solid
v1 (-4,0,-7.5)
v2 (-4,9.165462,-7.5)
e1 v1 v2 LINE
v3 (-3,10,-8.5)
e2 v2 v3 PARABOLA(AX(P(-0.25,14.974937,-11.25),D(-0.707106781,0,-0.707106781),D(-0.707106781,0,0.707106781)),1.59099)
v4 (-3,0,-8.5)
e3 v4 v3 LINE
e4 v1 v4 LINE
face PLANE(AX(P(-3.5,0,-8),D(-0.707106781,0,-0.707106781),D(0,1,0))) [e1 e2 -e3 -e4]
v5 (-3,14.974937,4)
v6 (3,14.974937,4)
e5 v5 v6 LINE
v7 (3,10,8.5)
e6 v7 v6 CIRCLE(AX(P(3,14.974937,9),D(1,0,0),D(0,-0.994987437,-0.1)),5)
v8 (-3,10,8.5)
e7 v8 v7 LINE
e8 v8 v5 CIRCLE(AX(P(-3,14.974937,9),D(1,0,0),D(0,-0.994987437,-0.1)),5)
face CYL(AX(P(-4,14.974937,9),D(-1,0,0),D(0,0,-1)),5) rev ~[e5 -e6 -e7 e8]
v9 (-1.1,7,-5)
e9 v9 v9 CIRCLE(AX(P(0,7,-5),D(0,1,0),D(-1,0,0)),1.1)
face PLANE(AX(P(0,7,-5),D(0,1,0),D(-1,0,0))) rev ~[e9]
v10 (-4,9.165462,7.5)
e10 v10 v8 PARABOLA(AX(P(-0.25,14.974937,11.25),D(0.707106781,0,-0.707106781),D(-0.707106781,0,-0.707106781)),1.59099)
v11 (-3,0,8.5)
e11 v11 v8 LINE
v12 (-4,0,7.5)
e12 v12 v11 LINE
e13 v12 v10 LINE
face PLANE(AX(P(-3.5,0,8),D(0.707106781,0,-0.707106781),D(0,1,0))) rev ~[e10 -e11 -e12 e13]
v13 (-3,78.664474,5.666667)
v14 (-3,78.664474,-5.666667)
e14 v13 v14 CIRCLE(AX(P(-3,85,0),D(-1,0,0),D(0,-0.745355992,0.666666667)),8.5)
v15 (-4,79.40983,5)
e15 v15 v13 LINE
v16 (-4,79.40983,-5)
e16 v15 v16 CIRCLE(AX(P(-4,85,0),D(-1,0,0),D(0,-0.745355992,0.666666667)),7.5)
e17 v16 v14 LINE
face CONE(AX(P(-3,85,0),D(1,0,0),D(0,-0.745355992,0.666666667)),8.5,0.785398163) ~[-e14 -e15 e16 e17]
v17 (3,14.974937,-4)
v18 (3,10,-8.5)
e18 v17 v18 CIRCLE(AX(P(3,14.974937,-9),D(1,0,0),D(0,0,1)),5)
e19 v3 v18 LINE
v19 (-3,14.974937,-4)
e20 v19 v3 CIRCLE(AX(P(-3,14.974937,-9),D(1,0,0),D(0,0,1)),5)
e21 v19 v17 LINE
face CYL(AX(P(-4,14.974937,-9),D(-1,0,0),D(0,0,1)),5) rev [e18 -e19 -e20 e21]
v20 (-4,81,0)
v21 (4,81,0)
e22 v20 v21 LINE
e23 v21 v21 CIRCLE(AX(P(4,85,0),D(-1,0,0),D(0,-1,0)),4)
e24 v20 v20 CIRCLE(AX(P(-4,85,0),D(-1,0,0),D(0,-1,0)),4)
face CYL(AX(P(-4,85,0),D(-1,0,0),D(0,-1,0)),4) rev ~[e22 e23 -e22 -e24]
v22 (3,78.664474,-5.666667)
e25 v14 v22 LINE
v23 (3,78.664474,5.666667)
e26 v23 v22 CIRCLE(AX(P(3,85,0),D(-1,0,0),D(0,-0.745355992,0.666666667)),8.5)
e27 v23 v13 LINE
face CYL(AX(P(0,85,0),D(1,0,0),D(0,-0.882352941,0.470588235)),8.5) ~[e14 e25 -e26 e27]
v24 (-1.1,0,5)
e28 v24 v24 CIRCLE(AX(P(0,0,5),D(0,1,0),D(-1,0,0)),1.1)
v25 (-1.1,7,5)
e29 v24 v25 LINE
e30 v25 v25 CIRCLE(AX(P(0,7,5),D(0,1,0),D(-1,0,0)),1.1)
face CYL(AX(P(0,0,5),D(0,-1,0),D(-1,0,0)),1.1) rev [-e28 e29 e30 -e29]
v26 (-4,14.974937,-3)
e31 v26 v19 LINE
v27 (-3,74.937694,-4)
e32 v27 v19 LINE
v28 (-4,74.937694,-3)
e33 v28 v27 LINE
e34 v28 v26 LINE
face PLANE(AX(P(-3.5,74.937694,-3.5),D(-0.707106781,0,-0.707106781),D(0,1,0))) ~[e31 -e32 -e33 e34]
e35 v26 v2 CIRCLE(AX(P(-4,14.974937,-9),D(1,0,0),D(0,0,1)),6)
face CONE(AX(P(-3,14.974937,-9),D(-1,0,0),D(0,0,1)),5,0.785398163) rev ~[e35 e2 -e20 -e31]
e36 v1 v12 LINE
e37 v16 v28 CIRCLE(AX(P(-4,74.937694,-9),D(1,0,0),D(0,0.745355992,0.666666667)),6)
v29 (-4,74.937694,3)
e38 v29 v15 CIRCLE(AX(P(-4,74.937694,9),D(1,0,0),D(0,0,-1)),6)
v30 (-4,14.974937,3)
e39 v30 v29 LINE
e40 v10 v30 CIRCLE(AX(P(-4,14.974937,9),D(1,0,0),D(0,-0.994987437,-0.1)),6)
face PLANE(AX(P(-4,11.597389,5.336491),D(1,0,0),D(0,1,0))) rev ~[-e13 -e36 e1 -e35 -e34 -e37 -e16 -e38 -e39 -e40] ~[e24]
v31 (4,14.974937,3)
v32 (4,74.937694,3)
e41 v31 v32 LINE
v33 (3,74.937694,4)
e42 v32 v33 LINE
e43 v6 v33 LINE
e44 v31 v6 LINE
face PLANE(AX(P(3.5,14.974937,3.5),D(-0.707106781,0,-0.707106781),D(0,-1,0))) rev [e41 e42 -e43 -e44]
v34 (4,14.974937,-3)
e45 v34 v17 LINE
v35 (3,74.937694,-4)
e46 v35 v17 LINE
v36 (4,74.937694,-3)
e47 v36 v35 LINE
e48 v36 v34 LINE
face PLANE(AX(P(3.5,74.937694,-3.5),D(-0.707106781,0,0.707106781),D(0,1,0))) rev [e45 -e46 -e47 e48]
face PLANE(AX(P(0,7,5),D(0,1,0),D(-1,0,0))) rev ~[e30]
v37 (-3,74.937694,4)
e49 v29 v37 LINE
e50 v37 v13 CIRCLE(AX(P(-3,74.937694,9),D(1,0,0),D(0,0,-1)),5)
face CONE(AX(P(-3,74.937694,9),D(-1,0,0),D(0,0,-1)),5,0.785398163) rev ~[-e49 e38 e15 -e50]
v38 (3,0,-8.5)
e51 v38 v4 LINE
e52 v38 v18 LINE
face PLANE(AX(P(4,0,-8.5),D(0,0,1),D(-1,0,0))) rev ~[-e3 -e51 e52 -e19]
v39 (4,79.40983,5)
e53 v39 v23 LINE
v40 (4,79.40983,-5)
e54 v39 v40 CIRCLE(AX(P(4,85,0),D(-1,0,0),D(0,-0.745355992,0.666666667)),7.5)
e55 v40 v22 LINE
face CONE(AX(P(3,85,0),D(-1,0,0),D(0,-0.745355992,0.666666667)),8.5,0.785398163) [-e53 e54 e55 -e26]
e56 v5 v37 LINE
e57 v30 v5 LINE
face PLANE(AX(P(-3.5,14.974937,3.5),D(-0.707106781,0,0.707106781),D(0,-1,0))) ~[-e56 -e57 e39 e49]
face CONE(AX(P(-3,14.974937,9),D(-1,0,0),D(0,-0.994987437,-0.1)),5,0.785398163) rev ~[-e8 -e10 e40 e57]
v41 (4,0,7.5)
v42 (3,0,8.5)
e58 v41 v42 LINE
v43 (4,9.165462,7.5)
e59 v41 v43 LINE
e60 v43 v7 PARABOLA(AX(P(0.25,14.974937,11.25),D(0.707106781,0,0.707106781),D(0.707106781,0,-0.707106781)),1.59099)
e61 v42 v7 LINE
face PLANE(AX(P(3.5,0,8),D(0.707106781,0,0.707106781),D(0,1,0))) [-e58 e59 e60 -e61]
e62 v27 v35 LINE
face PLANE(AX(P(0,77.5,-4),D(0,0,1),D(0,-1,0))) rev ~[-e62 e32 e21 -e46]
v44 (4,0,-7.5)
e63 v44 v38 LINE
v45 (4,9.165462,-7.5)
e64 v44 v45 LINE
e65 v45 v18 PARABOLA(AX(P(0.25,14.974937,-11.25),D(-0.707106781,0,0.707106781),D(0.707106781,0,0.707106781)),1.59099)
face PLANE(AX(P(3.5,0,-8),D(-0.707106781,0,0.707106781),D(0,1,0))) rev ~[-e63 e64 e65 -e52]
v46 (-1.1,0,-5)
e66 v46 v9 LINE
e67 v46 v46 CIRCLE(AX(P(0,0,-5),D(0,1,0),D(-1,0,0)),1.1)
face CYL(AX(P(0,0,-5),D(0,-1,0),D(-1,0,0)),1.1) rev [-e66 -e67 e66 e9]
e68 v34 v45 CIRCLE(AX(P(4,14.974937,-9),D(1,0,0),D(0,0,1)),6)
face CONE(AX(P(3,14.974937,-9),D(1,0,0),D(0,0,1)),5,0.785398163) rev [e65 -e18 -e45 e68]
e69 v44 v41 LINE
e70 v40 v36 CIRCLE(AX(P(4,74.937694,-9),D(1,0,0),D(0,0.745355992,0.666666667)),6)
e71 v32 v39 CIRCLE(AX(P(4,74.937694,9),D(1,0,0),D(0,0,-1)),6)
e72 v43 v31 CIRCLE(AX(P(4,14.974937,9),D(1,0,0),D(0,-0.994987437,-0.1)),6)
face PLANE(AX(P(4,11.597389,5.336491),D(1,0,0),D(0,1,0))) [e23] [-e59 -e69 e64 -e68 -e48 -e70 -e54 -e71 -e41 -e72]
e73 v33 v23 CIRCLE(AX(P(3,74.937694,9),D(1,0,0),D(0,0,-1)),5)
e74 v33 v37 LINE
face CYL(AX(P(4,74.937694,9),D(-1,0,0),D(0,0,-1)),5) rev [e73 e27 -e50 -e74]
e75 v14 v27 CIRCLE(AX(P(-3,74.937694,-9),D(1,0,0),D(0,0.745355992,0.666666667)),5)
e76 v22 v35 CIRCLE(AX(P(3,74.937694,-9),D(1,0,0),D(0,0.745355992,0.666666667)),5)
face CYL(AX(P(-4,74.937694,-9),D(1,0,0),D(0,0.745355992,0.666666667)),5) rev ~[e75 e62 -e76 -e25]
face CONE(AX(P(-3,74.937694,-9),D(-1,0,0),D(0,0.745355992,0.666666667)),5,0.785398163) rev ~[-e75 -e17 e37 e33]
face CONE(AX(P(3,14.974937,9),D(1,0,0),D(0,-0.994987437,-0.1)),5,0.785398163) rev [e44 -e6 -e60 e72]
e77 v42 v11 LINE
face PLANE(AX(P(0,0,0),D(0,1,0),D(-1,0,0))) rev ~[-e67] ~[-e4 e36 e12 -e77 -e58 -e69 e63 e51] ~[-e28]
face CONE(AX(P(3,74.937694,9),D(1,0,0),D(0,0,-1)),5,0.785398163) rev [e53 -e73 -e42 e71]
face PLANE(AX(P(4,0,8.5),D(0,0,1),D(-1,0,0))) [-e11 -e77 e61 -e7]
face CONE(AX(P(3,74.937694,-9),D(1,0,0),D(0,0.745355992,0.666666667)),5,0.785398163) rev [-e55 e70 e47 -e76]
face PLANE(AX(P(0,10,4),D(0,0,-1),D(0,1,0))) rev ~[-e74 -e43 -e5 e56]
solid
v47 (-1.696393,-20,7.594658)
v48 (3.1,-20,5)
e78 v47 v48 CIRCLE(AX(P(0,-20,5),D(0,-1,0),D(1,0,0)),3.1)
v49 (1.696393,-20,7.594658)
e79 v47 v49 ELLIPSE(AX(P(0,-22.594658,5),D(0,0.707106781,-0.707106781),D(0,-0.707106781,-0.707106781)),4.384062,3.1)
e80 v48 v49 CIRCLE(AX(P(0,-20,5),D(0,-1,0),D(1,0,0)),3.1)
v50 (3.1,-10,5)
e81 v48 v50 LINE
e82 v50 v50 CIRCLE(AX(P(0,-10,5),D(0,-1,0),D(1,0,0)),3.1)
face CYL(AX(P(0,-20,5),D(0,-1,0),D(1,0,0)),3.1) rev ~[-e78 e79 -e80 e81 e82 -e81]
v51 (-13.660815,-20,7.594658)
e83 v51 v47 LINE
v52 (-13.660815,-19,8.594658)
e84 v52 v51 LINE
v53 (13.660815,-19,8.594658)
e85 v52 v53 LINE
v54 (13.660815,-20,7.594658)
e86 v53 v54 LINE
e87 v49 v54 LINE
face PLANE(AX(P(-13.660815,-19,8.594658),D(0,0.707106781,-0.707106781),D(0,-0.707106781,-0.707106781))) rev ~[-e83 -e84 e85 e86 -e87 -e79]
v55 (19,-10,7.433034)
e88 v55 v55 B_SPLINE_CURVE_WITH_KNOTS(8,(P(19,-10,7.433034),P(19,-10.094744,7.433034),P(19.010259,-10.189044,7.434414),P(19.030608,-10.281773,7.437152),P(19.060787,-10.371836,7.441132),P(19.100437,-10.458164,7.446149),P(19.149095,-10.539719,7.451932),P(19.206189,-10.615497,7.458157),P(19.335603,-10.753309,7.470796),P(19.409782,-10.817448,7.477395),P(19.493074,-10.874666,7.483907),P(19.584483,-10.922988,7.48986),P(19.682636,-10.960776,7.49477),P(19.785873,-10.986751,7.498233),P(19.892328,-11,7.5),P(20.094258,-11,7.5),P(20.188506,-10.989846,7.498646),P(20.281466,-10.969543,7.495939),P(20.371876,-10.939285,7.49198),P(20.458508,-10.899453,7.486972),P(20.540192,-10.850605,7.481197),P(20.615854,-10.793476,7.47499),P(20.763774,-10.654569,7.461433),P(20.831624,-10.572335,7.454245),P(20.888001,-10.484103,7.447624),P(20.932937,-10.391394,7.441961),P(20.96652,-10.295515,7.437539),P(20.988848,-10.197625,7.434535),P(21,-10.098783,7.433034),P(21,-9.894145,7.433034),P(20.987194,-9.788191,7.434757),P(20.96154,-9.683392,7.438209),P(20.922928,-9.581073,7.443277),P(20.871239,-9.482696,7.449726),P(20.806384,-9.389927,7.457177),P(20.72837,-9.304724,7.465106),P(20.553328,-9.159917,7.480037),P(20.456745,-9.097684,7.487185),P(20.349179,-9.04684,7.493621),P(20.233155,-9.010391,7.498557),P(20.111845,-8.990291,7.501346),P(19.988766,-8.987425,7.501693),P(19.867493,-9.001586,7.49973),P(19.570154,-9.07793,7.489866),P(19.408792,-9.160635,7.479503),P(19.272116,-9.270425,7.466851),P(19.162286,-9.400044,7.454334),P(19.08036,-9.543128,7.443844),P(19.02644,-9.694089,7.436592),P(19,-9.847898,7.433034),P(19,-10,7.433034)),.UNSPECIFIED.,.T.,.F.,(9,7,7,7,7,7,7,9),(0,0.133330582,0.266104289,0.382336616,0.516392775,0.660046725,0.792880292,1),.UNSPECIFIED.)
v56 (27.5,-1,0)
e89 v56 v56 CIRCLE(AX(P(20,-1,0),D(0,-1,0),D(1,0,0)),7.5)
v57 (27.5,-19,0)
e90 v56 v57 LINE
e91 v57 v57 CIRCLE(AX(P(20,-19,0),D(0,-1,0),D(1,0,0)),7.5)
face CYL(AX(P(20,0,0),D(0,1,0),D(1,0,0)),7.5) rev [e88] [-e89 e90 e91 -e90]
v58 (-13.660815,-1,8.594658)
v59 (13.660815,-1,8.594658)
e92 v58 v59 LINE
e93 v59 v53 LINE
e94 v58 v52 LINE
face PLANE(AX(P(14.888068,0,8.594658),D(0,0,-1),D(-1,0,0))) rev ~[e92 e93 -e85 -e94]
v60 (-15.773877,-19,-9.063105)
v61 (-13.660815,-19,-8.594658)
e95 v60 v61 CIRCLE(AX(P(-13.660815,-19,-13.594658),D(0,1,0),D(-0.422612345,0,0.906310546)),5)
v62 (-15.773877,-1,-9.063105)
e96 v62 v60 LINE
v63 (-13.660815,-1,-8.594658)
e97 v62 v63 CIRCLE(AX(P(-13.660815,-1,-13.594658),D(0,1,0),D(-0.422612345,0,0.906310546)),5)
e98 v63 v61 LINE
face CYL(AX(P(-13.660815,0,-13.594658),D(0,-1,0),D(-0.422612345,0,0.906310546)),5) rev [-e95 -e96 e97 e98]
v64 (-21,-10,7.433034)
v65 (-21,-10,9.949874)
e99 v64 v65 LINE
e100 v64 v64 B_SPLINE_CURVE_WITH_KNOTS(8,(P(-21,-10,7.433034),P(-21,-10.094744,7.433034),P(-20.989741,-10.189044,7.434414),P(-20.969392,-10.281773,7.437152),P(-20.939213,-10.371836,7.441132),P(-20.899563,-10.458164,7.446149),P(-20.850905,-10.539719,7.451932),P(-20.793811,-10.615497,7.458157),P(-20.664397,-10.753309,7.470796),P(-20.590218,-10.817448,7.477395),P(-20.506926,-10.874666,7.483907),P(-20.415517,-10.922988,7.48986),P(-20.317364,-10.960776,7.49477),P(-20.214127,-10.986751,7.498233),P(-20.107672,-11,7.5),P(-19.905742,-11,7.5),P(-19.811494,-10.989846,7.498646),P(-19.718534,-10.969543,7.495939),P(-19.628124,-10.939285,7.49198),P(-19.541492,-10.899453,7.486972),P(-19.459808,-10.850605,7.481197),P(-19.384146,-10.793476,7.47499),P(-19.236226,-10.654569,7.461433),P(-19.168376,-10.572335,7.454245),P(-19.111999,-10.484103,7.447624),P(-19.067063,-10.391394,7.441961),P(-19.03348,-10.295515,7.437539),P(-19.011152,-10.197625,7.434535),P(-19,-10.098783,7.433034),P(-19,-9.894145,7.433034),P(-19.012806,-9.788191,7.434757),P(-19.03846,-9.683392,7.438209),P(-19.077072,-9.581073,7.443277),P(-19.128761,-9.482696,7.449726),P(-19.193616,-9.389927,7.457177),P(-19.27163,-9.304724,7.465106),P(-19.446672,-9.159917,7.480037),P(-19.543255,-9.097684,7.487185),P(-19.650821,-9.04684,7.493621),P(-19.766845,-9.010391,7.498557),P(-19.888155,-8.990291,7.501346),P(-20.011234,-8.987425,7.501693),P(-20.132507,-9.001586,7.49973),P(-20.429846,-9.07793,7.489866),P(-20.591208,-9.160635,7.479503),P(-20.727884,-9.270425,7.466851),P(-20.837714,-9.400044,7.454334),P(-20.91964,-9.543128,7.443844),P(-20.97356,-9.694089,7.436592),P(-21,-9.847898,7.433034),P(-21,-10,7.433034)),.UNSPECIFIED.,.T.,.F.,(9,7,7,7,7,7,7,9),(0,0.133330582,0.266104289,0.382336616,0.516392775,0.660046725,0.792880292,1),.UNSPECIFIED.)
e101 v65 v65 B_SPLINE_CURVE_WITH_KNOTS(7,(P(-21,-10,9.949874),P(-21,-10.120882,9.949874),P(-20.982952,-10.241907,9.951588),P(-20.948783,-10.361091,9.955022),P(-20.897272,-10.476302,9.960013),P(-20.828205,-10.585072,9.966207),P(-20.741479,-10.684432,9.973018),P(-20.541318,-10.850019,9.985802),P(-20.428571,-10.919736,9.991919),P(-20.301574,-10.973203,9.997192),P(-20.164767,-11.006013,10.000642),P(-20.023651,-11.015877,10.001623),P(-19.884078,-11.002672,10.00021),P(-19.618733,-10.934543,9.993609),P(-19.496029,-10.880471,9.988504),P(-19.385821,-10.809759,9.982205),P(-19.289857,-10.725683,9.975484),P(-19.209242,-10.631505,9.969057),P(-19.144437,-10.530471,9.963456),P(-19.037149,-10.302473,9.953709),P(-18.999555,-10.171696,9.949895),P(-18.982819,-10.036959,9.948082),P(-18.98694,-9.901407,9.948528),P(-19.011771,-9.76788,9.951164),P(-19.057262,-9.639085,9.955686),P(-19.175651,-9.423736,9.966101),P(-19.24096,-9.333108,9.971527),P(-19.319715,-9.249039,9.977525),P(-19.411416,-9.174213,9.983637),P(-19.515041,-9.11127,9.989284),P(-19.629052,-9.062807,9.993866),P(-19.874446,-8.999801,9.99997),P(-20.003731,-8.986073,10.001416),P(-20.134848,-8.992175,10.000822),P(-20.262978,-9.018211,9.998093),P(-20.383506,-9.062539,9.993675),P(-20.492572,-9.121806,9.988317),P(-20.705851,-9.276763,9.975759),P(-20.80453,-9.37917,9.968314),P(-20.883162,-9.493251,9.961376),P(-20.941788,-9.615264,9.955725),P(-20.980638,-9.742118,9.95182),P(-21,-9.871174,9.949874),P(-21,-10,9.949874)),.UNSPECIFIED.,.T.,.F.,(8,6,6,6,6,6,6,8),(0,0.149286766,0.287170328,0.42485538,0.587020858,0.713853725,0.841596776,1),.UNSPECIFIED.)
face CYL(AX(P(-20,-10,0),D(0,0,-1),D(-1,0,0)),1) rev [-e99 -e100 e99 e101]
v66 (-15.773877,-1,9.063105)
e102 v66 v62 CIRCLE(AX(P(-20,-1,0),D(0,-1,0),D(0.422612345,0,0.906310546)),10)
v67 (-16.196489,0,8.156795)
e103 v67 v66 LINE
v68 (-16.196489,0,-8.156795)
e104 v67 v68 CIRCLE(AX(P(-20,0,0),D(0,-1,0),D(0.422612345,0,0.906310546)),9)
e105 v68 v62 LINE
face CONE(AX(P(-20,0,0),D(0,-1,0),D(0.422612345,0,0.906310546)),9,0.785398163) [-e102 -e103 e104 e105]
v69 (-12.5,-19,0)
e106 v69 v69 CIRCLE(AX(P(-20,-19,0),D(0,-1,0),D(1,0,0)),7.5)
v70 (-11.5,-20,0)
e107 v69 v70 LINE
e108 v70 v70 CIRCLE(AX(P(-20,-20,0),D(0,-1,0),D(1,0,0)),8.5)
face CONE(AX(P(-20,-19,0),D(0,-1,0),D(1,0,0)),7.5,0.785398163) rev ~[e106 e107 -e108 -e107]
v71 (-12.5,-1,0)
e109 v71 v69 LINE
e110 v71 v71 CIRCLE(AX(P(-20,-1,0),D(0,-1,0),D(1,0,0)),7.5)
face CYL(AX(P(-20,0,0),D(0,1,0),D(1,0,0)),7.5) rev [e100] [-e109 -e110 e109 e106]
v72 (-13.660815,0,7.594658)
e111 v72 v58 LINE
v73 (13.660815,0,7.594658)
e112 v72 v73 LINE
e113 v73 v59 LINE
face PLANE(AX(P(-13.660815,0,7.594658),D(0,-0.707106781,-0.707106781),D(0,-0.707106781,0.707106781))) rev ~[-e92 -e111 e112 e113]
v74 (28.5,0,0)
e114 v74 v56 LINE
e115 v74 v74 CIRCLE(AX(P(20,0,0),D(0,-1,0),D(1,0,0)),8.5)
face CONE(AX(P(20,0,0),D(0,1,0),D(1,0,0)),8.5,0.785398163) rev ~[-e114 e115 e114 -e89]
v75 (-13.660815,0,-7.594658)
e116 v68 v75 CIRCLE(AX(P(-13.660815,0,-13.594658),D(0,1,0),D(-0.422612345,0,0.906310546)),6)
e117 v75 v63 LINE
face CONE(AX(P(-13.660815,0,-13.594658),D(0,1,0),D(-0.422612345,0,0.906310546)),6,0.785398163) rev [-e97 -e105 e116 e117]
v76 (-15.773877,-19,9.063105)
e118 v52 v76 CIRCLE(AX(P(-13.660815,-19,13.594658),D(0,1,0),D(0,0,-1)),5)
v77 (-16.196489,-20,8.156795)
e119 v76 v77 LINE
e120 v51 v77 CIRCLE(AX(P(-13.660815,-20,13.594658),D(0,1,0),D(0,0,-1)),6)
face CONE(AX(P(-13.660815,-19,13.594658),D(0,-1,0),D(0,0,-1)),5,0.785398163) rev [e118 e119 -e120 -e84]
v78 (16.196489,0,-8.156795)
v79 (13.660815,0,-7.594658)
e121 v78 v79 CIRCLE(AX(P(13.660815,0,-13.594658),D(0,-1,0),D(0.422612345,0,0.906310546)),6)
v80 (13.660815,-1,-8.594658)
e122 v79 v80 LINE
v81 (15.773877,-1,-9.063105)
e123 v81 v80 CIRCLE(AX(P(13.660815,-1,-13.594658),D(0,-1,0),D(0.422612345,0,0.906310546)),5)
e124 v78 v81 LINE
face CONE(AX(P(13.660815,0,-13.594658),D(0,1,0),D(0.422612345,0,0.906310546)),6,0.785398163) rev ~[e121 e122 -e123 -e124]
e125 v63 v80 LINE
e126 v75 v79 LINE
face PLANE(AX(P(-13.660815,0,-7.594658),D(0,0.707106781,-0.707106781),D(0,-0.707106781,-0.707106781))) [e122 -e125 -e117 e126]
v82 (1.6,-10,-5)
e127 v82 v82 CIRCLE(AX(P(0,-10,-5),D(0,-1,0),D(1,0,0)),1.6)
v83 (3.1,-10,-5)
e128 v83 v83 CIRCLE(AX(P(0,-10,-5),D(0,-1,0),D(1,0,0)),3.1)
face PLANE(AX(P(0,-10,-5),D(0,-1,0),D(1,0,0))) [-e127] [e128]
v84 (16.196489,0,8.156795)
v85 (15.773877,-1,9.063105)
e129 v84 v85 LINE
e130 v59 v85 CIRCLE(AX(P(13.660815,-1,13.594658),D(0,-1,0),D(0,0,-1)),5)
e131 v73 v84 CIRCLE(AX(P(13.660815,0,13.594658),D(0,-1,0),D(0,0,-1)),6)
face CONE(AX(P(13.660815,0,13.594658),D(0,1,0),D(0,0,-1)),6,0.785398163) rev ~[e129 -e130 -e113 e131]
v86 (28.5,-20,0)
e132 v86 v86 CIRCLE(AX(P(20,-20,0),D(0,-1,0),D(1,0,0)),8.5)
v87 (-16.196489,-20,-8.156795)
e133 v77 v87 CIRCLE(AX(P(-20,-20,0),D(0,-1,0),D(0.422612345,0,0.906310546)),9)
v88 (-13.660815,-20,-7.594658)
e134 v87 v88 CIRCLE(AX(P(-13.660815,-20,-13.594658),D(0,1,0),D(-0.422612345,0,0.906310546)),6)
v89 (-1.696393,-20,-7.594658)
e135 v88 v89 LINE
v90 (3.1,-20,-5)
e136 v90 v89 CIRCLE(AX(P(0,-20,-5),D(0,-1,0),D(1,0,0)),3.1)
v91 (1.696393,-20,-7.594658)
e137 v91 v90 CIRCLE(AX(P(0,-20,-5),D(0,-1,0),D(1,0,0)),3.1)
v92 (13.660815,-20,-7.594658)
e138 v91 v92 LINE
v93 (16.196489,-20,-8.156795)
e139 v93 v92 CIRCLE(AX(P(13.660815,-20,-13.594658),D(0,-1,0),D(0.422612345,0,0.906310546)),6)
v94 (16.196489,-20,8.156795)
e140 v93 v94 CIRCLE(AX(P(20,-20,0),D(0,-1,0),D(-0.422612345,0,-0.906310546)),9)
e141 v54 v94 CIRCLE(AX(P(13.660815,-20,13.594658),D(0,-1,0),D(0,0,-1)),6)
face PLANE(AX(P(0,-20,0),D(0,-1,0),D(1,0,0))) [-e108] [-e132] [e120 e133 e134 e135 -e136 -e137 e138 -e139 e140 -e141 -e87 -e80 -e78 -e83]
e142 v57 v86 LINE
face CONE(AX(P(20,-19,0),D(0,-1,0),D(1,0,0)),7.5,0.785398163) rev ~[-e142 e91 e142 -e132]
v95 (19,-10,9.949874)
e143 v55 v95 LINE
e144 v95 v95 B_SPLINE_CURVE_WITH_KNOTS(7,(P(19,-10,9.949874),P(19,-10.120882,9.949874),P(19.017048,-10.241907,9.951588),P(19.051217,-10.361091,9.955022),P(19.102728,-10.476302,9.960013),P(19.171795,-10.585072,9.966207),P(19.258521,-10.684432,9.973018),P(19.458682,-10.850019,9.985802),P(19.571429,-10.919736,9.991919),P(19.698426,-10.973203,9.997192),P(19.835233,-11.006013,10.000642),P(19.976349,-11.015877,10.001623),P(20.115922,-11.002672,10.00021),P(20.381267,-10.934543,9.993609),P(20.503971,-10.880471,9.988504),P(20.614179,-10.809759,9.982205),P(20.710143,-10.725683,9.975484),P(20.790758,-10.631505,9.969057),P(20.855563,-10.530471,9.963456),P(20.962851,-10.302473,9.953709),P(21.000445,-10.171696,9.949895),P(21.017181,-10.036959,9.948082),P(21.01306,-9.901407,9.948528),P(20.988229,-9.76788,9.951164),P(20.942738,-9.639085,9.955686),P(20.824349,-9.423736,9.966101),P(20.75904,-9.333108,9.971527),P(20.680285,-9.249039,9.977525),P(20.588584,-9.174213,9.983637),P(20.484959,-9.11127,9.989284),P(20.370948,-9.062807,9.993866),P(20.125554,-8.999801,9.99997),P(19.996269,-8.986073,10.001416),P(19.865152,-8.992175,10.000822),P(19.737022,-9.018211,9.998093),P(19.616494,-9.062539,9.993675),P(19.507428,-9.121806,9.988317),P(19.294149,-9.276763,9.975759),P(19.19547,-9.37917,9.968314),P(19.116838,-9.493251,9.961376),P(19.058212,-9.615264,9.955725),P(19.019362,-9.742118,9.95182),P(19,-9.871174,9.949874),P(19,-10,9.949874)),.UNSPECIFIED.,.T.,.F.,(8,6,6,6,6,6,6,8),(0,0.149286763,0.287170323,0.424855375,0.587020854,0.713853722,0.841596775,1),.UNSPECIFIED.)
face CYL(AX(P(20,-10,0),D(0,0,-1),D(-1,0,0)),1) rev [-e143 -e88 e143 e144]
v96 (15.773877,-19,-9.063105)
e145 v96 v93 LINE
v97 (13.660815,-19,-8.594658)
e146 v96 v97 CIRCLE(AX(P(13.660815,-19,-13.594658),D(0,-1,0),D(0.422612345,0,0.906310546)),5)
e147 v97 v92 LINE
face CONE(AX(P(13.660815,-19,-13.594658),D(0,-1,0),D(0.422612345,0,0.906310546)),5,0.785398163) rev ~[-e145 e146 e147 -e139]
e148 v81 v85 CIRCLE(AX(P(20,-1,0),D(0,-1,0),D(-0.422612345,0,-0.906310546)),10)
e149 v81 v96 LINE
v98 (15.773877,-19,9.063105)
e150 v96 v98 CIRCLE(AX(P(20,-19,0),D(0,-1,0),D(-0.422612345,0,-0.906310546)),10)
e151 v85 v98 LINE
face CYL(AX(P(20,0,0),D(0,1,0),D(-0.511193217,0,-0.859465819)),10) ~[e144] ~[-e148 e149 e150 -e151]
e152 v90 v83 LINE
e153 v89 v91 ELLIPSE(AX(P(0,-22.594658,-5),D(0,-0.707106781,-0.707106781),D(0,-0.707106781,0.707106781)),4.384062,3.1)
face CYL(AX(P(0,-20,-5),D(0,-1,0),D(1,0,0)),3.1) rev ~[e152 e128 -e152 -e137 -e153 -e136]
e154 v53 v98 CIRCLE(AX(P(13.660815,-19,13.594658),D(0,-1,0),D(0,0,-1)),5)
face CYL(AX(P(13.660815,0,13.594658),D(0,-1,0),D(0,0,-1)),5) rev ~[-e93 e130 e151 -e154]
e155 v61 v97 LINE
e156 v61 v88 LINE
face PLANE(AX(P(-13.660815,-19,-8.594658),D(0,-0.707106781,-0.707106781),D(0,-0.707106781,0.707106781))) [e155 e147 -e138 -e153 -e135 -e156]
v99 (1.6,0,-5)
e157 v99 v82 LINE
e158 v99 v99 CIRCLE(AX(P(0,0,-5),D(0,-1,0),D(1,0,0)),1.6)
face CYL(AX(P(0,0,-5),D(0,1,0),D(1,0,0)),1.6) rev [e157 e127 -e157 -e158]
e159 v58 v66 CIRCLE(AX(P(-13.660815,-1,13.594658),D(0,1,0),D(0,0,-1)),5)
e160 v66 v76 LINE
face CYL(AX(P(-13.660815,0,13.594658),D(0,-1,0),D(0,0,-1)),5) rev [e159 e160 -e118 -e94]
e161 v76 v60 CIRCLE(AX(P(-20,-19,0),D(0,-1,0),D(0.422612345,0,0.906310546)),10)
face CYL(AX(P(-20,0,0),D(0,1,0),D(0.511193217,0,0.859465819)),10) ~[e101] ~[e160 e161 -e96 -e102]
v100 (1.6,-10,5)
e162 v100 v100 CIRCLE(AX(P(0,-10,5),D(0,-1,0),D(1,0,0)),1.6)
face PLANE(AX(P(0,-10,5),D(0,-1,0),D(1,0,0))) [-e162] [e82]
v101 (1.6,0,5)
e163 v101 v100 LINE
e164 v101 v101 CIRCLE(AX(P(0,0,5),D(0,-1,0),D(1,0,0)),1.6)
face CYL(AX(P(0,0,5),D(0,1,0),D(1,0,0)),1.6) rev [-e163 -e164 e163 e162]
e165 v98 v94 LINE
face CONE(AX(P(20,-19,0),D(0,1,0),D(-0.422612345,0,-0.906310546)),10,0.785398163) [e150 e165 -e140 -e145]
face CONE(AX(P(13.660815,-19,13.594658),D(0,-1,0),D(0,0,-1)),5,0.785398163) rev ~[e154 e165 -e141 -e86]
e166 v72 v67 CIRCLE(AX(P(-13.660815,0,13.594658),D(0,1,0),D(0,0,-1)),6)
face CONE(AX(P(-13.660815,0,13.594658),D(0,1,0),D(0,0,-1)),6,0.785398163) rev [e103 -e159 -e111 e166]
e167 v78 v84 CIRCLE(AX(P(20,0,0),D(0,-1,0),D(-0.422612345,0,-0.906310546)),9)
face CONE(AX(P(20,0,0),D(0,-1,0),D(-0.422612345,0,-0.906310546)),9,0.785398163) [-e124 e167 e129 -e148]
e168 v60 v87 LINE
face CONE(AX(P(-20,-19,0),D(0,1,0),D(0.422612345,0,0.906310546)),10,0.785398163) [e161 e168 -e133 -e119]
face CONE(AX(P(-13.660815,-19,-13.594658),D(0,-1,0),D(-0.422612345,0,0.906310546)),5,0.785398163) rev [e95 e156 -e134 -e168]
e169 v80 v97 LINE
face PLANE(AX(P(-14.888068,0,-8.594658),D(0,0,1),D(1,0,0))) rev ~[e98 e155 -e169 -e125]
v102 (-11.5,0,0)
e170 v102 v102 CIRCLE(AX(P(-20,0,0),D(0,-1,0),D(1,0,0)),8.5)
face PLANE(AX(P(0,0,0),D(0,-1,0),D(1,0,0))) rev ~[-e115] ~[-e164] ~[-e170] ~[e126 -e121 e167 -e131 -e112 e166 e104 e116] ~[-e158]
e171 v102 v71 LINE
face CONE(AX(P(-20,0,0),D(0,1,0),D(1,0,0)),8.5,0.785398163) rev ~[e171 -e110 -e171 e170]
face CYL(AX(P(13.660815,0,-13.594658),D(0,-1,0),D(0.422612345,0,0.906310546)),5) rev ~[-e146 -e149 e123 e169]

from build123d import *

# Parameters (mm, degrees)
F0_R          = 7.5
F0_R_2        = 1.6
F1_DEPTH      = 20
F2_W          = 8
F2_H          = 17
F2_R          = 1.1
F3_DEPTH      = 95
F4_DEPTH      = 7
F5_R          = 3.1
F5_R_2        = 1.6
F6_DEPTH      = 10
F7_R          = 4
F8_DEPTH      = 25
F12_DEPTH     = 15
F14_R         = 5
F15_R         = 5
F16_DEPTH     = 12.5
F17_T1_DEPTH  = 8
F18_R         = 5
F19_T1_DEPTH  = 27.3216296593
F19_T12_ANGLE = 24.9996259311
F19_T14_ANGLE = 24.9996259311
F19_T16_ANGLE = 229.9992518621
F19_T18_ANGLE = 24.9996259311
F19_T20_ANGLE = 24.9996259311
F19_T22_ANGLE = 229.9992518621
F19_T24_ANGLE = 24.9996259311
F19_T26_ANGLE = 24.9996259311
F19_T28_ANGLE = 229.9992518621
F19_T30_ANGLE = 24.9996259311
F19_T32_ANGLE = 24.9996259311
F19_T34_ANGLE = 229.9992518621
F20_SIZE      = 1


# Not quite as in the source:
# - a fillet or chamfer that OpenCascade refuses, or shapes differently, is made with other operations: its cross-section is extruded or revolved along the edge and cut away or added
# - a feature names something its author has since deleted; it is built from what else it names


with BuildPart() as f1:
    # F0 (on Front) → F1 (new body)
    with BuildSketch(Plane.XZ):
        with BuildLine():
            Line((14.8880678261, 8.5946581927), (-14.8880678261, 8.5946581927))
            ThreePointArc((-14.8880678261, 8.5946581927), (-30, 0), (-14.8880678261, -8.5946581927))
            Line((-14.8880678261, -8.5946581927), (14.8880678261, -8.5946581927))
            ThreePointArc((14.8880678261, -8.5946581927), (30, 0), (14.8880678261, 8.5946581927))
        make_face()
        with Locations((-20, 0)):
            Circle(F0_R, mode=Mode.SUBTRACT)
        with Locations((0, -5)):
            Circle(F0_R_2, mode=Mode.SUBTRACT)
        with Locations((20, 0)):
            Circle(F0_R, mode=Mode.SUBTRACT)
        with Locations((0, 5)):
            Circle(F0_R_2, mode=Mode.SUBTRACT)
    extrude(amount=F1_DEPTH)

    # F5 (on face) → F6 (cut)
    with BuildSketch(Plane.XZ.offset(20)):
        with Locations((0, 5)):
            Circle(F5_R)
        with Locations((0, 5)):
            Circle(F5_R_2, mode=Mode.SUBTRACT)
        with Locations((0, -5)):
            Circle(F5_R)
        with Locations((0, -5)):
            Circle(F5_R_2, mode=Mode.SUBTRACT)
    extrude(amount=-F6_DEPTH, mode=Mode.SUBTRACT)

    # F11 (on Top) → F12 (cut)
    with BuildSketch(Plane.XY):
        with BuildLine():
            ThreePointArc((-19, -10), (-20, -9), (-21, -10))
            Line((-21, -10), (-19, -10))
        make_face()
        with BuildLine():
            ThreePointArc((21, -10), (20, -9), (19, -10))
            Line((19, -10), (21, -10))
        make_face()
        with BuildLine():
            Line((21, -10), (19, -10))
            ThreePointArc((19, -10), (20, -11), (21, -10))
        make_face()
        with BuildLine():
            Line((-19, -10), (-21, -10))
            ThreePointArc((-21, -10), (-20, -11), (-19, -10))
        make_face()
    extrude(amount=F12_DEPTH, mode=Mode.SUBTRACT)

    # F14
    f14_edges = [f1.edges().sort_by_distance(p)[0] for p in [
        (-14.888068, -10, 8.594658),
    ]]
    fillet(f14_edges, radius=F14_R)

    # F15
    f15_edges = [f1.edges().sort_by_distance(p)[0] for p in [
        (-14.888068, -10, -8.594658),
        (14.888068, -10, -8.594658),
        (14.888068, -10, 8.594658),
    ]]
    fillet(f15_edges, radius=F15_R)

    # F19: chamfer of 1 on 6 edges, made by hand

    # F19_s2 → F19_t1 (cut)
    with BuildSketch(Plane.YZ.offset(-13.6608148297)):
        Polygon((0, -7.5946581927), (-1, -8.5946581927), (0, -8.5946581927), align=None)
        Polygon((-19, -8.5946581927), (-20, -7.5946581927), (-20, -8.5946581927), align=None)
        Polygon((-19, 8.5946581927), (-20, 7.5946581927), (-20, 8.5946581927), align=None)
        Polygon((0, 7.5946581927), (-1, 8.5946581927), (0, 8.5946581927), align=None)
    extrude(amount=F19_T1_DEPTH, mode=Mode.SUBTRACT)

    # F19_s3 → F19_t4 (revolve, cut)
    with BuildSketch(Plane.XY):
        Polygon((-11.5, 0), (-12.5, -1), (-12.5, 0), align=None)
    revolve(axis=Axis((-20, 0, 0), (0, -1, 0)), mode=Mode.SUBTRACT)

    # F19_s5 → F19_t6 (revolve, cut)
    with BuildSketch(Plane.XY):
        Polygon((28.5, 0), (27.5, -1), (27.5, 0), align=None)
    revolve(axis=Axis((20, 0, 0), (0, -1, 0)), mode=Mode.SUBTRACT)

    # F19_s7 → F19_t8 (revolve, cut)
    with BuildSketch(Plane.XY):
        Polygon((-12.5, -19), (-11.5, -20), (-12.5, -20), align=None)
    revolve(axis=Axis((-20, -20, 0), (0, -1, 0)), mode=Mode.SUBTRACT)

    # F19_s9 → F19_t10 (revolve, cut)
    with BuildSketch(Plane.XY):
        Polygon((27.5, -19), (28.5, -20), (27.5, -20), align=None)
    revolve(axis=Axis((20, -20, 0), (0, -1, 0)), mode=Mode.SUBTRACT)

    # F19_s11 → F19_t12 (revolve, cut)
    with BuildSketch(Plane(origin=(-16.4279761223, 0, -7.6603604987), x_dir=(0, 1, 0), z_dir=(-0.9063105462, 0, -0.4226123447))):
        Polygon((-19, 1.5477531062), (-20, 0.5477531062), (-20, 1.5477531062), align=None)
    revolve(axis=Axis((-13.6608148297, -20, -13.5946581927), (0, 1, 0)), revolution_arc=F19_T12_ANGLE, mode=Mode.SUBTRACT)

    # F19_s13 → F19_t14 (revolve, cut)
    with BuildSketch(Plane(origin=(16.4279761223, 0, -7.6603604987), x_dir=(0, 1, 0), z_dir=(0.9063105462, 0, -0.4226123447))):
        Polygon((-19, -1.5477531062), (-20, -0.5477531062), (-20, -1.5477531062), align=None)
    revolve(axis=Axis((13.6608148297, -20, -13.5946581927), (0, -1, 0)), revolution_arc=F19_T14_ANGLE, mode=Mode.SUBTRACT)

    # F19_s15 → F19_t16 (revolve, cut)
    with BuildSketch(Plane(origin=(16.4279761223, 0, -7.6603604987), x_dir=(0, 1, 0), z_dir=(-0.9063105462, 0, 0.4226123447))):
        Polygon((-19, 1.5477531062), (-20, 0.5477531062), (-20, 1.5477531062), align=None)
    revolve(axis=Axis((20, -20, 0), (0, -1, 0)), revolution_arc=F19_T16_ANGLE, mode=Mode.SUBTRACT)

    # F19_s17 → F19_t18 (revolve, cut)
    with BuildSketch(Plane.YZ.offset(13.6608148297)):
        Polygon((-19, 8.5946581927), (-20, 7.5946581927), (-20, 8.5946581927), align=None)
    revolve(axis=Axis((13.6608148297, -20, 13.5946581927), (0, -1, 0)), revolution_arc=F19_T18_ANGLE, mode=Mode.SUBTRACT)

    # F19_s19 → F19_t20 (revolve, cut)
    with BuildSketch(Plane.YZ.offset(-13.6608148297)):
        Polygon((-19, 8.5946581927), (-20, 7.5946581927), (-20, 8.5946581927), align=None)
    revolve(axis=Axis((-13.6608148297, -20, 13.5946581927), (0, 1, 0)), revolution_arc=F19_T20_ANGLE, mode=Mode.SUBTRACT)

    # F19_s21 → F19_t22 (revolve, cut)
    with BuildSketch(Plane(origin=(-16.4279761223, 0, 7.6603604987), x_dir=(0, 1, 0), z_dir=(0.9063105462, 0, -0.4226123447))):
        Polygon((-19, 1.5477531062), (-20, 0.5477531062), (-20, 1.5477531062), align=None)
    revolve(axis=Axis((-20, -20, 0), (0, -1, 0)), revolution_arc=F19_T22_ANGLE, mode=Mode.SUBTRACT)

    # F19_s23 → F19_t24 (revolve, cut)
    with BuildSketch(Plane(origin=(-16.4279761223, 0, -7.6603604987), x_dir=(0, 1, 0), z_dir=(-0.9063105462, 0, -0.4226123447))):
        Polygon((0, 0.5477531062), (-1, 1.5477531062), (0, 1.5477531062), align=None)
    revolve(axis=Axis((-13.6608148297, 0, -13.5946581927), (0, 1, 0)), revolution_arc=F19_T24_ANGLE, mode=Mode.SUBTRACT)

    # F19_s25 → F19_t26 (revolve, cut)
    with BuildSketch(Plane(origin=(16.4279761223, 0, -7.6603604987), x_dir=(0, 1, 0), z_dir=(0.9063105462, 0, -0.4226123447))):
        Polygon((0, -0.5477531062), (-1, -1.5477531062), (0, -1.5477531062), align=None)
    revolve(axis=Axis((13.6608148297, 0, -13.5946581927), (0, -1, 0)), revolution_arc=F19_T26_ANGLE, mode=Mode.SUBTRACT)

    # F19_s27 → F19_t28 (revolve, cut)
    with BuildSketch(Plane(origin=(16.4279761223, 0, -7.6603604987), x_dir=(0, 1, 0), z_dir=(-0.9063105462, 0, 0.4226123447))):
        Polygon((0, 0.5477531062), (-1, 1.5477531062), (0, 1.5477531062), align=None)
    revolve(axis=Axis((20, 0, 0), (0, -1, 0)), revolution_arc=F19_T28_ANGLE, mode=Mode.SUBTRACT)

    # F19_s29 → F19_t30 (revolve, cut)
    with BuildSketch(Plane.YZ.offset(13.6608148297)):
        Polygon((0, 7.5946581927), (-1, 8.5946581927), (0, 8.5946581927), align=None)
    revolve(axis=Axis((13.6608148297, 0, 13.5946581927), (0, -1, 0)), revolution_arc=F19_T30_ANGLE, mode=Mode.SUBTRACT)

    # F19_s31 → F19_t32 (revolve, cut)
    with BuildSketch(Plane.YZ.offset(-13.6608148297)):
        Polygon((0, 7.5946581927), (-1, 8.5946581927), (0, 8.5946581927), align=None)
    revolve(axis=Axis((-13.6608148297, 0, 13.5946581927), (0, 1, 0)), revolution_arc=F19_T32_ANGLE, mode=Mode.SUBTRACT)

    # F19_s33 → F19_t34 (revolve, cut)
    with BuildSketch(Plane(origin=(-16.4279761223, 0, 7.6603604987), x_dir=(0, 1, 0), z_dir=(0.9063105462, 0, -0.4226123447))):
        Polygon((0, 0.5477531062), (-1, 1.5477531062), (0, 1.5477531062), align=None)
    revolve(axis=Axis((-20, 0, 0), (0, -1, 0)), revolution_arc=F19_T34_ANGLE, mode=Mode.SUBTRACT)


with BuildPart() as f3:
    # F2 (on face) → F3 (new body)
    with BuildSketch(Plane(origin=(0, 0, 0), x_dir=(-1, 0, 0), z_dir=(0, 1, 0))):
        Rectangle(F2_W, F2_H)
        with Locations((0, -5)):
            Circle(F2_R, mode=Mode.SUBTRACT)
        with Locations((0, 5)):
            Circle(F2_R, mode=Mode.SUBTRACT)
        with Locations((0, 5)):
            Circle(F2_R)
        with Locations((0, -5)):
            Circle(F2_R)
    extrude(amount=F3_DEPTH)

    # F2 (on face) → F4 (cut)
    with BuildSketch(Plane(origin=(0, 0, 0), x_dir=(-1, 0, 0), z_dir=(0, 1, 0))):
        with Locations((0, 5)):
            Circle(F2_R)
        with Locations((0, -5)):
            Circle(F2_R)
    extrude(amount=F4_DEPTH, mode=Mode.SUBTRACT)

    # F7 (on face) → F8 (cut)
    with BuildSketch(Plane(origin=(-4, 0, 0), x_dir=(0, -1, 0), z_dir=(-1, 0, 0))):
        with Locations((-85, 0)):
            Circle(F7_R)
    extrude(amount=-F8_DEPTH, mode=Mode.SUBTRACT)

    # F13 (on Right) → F16 (cut, symmetric)
    with BuildSketch(Plane.YZ):
        with BuildLine():
            ThreePointArc((77.5, 4), (93.5, 0), (77.5, -4))
            Line((77.5, -4), (10, -4))
            Line((10, -4), (10, -10))
            Line((10, -10), (0, -10))
            Line((0, -10), (0, -17.4690615386))
            Line((0, -17.4690615386), (98.2531383634, -15.3523003682))
            Line((98.2531383634, -15.3523003682), (98.2531383634, 24.7300937772))
            Line((98.2531383634, 24.7300937772), (0, 24.7300937772))
            Line((0, 24.7300937772), (0, 10))
            Line((0, 10), (10, 10))
            Line((10, 10), (10, 4))
            Line((10, 4), (77.5, 4))
        make_face()
    extrude(amount=F16_DEPTH, both=True, mode=Mode.SUBTRACT)

    # F17: fillet of radius 5 on 2 edges, made by hand

    # F17_s2 → F17_t1 (join)
    with BuildSketch(Plane.YZ.offset(-4)):
        with BuildLine():
            ThreePointArc((14.9749371855, 4), (11.6208352193, 5.2919007565), (10, 8.5))
            Line((10, 8.5), (10, 4))
            Line((10, 4), (14.9749371855, 4))
        make_face()
        with BuildLine():
            ThreePointArc((14.9749371855, -4), (11.6208352193, -5.2919007565), (10, -8.5))
            Line((10, -8.5), (10, -4))
            Line((10, -4), (14.9749371855, -4))
        make_face()
    extrude(amount=F17_T1_DEPTH)

    # F18
    f18_edges = [f3.edges().sort_by_distance(p)[0] for p in [
        (0, 77.5, 4),
        (0, 77.5, -4),
    ]]
    fillet(f18_edges, radius=F18_R)

    # F20
    f20_edges = [f3.edges().sort_by_distance(p)[0] for p in [
        (4, 44.956316, -4),
        (-4, 44.956316, -4),
        (4, 5, -8.5),
        (4, 5, 8.5),
        (-4, 5, -8.5),
        (-4, 5, 8.5),
        (-4, 76.978936, -4.435645),
        (-4, 11.620835, -5.291901),
        (-4, 93.5, 0),
        (-4, 76.978936, 4.435645),
        (-4, 44.956316, 4),
        (-4, 11.620835, 5.291901),
        (4, 76.978936, -4.435645),
        (4, 11.620835, -5.291901),
        (4, 93.5, 0),
        (4, 76.978936, 4.435645),
        (4, 44.956316, 4),
        (4, 11.620835, 5.291901),
    ]]
    chamfer(f20_edges, length=F20_SIZE)


solid = Compound([f1.part, f3.part])
